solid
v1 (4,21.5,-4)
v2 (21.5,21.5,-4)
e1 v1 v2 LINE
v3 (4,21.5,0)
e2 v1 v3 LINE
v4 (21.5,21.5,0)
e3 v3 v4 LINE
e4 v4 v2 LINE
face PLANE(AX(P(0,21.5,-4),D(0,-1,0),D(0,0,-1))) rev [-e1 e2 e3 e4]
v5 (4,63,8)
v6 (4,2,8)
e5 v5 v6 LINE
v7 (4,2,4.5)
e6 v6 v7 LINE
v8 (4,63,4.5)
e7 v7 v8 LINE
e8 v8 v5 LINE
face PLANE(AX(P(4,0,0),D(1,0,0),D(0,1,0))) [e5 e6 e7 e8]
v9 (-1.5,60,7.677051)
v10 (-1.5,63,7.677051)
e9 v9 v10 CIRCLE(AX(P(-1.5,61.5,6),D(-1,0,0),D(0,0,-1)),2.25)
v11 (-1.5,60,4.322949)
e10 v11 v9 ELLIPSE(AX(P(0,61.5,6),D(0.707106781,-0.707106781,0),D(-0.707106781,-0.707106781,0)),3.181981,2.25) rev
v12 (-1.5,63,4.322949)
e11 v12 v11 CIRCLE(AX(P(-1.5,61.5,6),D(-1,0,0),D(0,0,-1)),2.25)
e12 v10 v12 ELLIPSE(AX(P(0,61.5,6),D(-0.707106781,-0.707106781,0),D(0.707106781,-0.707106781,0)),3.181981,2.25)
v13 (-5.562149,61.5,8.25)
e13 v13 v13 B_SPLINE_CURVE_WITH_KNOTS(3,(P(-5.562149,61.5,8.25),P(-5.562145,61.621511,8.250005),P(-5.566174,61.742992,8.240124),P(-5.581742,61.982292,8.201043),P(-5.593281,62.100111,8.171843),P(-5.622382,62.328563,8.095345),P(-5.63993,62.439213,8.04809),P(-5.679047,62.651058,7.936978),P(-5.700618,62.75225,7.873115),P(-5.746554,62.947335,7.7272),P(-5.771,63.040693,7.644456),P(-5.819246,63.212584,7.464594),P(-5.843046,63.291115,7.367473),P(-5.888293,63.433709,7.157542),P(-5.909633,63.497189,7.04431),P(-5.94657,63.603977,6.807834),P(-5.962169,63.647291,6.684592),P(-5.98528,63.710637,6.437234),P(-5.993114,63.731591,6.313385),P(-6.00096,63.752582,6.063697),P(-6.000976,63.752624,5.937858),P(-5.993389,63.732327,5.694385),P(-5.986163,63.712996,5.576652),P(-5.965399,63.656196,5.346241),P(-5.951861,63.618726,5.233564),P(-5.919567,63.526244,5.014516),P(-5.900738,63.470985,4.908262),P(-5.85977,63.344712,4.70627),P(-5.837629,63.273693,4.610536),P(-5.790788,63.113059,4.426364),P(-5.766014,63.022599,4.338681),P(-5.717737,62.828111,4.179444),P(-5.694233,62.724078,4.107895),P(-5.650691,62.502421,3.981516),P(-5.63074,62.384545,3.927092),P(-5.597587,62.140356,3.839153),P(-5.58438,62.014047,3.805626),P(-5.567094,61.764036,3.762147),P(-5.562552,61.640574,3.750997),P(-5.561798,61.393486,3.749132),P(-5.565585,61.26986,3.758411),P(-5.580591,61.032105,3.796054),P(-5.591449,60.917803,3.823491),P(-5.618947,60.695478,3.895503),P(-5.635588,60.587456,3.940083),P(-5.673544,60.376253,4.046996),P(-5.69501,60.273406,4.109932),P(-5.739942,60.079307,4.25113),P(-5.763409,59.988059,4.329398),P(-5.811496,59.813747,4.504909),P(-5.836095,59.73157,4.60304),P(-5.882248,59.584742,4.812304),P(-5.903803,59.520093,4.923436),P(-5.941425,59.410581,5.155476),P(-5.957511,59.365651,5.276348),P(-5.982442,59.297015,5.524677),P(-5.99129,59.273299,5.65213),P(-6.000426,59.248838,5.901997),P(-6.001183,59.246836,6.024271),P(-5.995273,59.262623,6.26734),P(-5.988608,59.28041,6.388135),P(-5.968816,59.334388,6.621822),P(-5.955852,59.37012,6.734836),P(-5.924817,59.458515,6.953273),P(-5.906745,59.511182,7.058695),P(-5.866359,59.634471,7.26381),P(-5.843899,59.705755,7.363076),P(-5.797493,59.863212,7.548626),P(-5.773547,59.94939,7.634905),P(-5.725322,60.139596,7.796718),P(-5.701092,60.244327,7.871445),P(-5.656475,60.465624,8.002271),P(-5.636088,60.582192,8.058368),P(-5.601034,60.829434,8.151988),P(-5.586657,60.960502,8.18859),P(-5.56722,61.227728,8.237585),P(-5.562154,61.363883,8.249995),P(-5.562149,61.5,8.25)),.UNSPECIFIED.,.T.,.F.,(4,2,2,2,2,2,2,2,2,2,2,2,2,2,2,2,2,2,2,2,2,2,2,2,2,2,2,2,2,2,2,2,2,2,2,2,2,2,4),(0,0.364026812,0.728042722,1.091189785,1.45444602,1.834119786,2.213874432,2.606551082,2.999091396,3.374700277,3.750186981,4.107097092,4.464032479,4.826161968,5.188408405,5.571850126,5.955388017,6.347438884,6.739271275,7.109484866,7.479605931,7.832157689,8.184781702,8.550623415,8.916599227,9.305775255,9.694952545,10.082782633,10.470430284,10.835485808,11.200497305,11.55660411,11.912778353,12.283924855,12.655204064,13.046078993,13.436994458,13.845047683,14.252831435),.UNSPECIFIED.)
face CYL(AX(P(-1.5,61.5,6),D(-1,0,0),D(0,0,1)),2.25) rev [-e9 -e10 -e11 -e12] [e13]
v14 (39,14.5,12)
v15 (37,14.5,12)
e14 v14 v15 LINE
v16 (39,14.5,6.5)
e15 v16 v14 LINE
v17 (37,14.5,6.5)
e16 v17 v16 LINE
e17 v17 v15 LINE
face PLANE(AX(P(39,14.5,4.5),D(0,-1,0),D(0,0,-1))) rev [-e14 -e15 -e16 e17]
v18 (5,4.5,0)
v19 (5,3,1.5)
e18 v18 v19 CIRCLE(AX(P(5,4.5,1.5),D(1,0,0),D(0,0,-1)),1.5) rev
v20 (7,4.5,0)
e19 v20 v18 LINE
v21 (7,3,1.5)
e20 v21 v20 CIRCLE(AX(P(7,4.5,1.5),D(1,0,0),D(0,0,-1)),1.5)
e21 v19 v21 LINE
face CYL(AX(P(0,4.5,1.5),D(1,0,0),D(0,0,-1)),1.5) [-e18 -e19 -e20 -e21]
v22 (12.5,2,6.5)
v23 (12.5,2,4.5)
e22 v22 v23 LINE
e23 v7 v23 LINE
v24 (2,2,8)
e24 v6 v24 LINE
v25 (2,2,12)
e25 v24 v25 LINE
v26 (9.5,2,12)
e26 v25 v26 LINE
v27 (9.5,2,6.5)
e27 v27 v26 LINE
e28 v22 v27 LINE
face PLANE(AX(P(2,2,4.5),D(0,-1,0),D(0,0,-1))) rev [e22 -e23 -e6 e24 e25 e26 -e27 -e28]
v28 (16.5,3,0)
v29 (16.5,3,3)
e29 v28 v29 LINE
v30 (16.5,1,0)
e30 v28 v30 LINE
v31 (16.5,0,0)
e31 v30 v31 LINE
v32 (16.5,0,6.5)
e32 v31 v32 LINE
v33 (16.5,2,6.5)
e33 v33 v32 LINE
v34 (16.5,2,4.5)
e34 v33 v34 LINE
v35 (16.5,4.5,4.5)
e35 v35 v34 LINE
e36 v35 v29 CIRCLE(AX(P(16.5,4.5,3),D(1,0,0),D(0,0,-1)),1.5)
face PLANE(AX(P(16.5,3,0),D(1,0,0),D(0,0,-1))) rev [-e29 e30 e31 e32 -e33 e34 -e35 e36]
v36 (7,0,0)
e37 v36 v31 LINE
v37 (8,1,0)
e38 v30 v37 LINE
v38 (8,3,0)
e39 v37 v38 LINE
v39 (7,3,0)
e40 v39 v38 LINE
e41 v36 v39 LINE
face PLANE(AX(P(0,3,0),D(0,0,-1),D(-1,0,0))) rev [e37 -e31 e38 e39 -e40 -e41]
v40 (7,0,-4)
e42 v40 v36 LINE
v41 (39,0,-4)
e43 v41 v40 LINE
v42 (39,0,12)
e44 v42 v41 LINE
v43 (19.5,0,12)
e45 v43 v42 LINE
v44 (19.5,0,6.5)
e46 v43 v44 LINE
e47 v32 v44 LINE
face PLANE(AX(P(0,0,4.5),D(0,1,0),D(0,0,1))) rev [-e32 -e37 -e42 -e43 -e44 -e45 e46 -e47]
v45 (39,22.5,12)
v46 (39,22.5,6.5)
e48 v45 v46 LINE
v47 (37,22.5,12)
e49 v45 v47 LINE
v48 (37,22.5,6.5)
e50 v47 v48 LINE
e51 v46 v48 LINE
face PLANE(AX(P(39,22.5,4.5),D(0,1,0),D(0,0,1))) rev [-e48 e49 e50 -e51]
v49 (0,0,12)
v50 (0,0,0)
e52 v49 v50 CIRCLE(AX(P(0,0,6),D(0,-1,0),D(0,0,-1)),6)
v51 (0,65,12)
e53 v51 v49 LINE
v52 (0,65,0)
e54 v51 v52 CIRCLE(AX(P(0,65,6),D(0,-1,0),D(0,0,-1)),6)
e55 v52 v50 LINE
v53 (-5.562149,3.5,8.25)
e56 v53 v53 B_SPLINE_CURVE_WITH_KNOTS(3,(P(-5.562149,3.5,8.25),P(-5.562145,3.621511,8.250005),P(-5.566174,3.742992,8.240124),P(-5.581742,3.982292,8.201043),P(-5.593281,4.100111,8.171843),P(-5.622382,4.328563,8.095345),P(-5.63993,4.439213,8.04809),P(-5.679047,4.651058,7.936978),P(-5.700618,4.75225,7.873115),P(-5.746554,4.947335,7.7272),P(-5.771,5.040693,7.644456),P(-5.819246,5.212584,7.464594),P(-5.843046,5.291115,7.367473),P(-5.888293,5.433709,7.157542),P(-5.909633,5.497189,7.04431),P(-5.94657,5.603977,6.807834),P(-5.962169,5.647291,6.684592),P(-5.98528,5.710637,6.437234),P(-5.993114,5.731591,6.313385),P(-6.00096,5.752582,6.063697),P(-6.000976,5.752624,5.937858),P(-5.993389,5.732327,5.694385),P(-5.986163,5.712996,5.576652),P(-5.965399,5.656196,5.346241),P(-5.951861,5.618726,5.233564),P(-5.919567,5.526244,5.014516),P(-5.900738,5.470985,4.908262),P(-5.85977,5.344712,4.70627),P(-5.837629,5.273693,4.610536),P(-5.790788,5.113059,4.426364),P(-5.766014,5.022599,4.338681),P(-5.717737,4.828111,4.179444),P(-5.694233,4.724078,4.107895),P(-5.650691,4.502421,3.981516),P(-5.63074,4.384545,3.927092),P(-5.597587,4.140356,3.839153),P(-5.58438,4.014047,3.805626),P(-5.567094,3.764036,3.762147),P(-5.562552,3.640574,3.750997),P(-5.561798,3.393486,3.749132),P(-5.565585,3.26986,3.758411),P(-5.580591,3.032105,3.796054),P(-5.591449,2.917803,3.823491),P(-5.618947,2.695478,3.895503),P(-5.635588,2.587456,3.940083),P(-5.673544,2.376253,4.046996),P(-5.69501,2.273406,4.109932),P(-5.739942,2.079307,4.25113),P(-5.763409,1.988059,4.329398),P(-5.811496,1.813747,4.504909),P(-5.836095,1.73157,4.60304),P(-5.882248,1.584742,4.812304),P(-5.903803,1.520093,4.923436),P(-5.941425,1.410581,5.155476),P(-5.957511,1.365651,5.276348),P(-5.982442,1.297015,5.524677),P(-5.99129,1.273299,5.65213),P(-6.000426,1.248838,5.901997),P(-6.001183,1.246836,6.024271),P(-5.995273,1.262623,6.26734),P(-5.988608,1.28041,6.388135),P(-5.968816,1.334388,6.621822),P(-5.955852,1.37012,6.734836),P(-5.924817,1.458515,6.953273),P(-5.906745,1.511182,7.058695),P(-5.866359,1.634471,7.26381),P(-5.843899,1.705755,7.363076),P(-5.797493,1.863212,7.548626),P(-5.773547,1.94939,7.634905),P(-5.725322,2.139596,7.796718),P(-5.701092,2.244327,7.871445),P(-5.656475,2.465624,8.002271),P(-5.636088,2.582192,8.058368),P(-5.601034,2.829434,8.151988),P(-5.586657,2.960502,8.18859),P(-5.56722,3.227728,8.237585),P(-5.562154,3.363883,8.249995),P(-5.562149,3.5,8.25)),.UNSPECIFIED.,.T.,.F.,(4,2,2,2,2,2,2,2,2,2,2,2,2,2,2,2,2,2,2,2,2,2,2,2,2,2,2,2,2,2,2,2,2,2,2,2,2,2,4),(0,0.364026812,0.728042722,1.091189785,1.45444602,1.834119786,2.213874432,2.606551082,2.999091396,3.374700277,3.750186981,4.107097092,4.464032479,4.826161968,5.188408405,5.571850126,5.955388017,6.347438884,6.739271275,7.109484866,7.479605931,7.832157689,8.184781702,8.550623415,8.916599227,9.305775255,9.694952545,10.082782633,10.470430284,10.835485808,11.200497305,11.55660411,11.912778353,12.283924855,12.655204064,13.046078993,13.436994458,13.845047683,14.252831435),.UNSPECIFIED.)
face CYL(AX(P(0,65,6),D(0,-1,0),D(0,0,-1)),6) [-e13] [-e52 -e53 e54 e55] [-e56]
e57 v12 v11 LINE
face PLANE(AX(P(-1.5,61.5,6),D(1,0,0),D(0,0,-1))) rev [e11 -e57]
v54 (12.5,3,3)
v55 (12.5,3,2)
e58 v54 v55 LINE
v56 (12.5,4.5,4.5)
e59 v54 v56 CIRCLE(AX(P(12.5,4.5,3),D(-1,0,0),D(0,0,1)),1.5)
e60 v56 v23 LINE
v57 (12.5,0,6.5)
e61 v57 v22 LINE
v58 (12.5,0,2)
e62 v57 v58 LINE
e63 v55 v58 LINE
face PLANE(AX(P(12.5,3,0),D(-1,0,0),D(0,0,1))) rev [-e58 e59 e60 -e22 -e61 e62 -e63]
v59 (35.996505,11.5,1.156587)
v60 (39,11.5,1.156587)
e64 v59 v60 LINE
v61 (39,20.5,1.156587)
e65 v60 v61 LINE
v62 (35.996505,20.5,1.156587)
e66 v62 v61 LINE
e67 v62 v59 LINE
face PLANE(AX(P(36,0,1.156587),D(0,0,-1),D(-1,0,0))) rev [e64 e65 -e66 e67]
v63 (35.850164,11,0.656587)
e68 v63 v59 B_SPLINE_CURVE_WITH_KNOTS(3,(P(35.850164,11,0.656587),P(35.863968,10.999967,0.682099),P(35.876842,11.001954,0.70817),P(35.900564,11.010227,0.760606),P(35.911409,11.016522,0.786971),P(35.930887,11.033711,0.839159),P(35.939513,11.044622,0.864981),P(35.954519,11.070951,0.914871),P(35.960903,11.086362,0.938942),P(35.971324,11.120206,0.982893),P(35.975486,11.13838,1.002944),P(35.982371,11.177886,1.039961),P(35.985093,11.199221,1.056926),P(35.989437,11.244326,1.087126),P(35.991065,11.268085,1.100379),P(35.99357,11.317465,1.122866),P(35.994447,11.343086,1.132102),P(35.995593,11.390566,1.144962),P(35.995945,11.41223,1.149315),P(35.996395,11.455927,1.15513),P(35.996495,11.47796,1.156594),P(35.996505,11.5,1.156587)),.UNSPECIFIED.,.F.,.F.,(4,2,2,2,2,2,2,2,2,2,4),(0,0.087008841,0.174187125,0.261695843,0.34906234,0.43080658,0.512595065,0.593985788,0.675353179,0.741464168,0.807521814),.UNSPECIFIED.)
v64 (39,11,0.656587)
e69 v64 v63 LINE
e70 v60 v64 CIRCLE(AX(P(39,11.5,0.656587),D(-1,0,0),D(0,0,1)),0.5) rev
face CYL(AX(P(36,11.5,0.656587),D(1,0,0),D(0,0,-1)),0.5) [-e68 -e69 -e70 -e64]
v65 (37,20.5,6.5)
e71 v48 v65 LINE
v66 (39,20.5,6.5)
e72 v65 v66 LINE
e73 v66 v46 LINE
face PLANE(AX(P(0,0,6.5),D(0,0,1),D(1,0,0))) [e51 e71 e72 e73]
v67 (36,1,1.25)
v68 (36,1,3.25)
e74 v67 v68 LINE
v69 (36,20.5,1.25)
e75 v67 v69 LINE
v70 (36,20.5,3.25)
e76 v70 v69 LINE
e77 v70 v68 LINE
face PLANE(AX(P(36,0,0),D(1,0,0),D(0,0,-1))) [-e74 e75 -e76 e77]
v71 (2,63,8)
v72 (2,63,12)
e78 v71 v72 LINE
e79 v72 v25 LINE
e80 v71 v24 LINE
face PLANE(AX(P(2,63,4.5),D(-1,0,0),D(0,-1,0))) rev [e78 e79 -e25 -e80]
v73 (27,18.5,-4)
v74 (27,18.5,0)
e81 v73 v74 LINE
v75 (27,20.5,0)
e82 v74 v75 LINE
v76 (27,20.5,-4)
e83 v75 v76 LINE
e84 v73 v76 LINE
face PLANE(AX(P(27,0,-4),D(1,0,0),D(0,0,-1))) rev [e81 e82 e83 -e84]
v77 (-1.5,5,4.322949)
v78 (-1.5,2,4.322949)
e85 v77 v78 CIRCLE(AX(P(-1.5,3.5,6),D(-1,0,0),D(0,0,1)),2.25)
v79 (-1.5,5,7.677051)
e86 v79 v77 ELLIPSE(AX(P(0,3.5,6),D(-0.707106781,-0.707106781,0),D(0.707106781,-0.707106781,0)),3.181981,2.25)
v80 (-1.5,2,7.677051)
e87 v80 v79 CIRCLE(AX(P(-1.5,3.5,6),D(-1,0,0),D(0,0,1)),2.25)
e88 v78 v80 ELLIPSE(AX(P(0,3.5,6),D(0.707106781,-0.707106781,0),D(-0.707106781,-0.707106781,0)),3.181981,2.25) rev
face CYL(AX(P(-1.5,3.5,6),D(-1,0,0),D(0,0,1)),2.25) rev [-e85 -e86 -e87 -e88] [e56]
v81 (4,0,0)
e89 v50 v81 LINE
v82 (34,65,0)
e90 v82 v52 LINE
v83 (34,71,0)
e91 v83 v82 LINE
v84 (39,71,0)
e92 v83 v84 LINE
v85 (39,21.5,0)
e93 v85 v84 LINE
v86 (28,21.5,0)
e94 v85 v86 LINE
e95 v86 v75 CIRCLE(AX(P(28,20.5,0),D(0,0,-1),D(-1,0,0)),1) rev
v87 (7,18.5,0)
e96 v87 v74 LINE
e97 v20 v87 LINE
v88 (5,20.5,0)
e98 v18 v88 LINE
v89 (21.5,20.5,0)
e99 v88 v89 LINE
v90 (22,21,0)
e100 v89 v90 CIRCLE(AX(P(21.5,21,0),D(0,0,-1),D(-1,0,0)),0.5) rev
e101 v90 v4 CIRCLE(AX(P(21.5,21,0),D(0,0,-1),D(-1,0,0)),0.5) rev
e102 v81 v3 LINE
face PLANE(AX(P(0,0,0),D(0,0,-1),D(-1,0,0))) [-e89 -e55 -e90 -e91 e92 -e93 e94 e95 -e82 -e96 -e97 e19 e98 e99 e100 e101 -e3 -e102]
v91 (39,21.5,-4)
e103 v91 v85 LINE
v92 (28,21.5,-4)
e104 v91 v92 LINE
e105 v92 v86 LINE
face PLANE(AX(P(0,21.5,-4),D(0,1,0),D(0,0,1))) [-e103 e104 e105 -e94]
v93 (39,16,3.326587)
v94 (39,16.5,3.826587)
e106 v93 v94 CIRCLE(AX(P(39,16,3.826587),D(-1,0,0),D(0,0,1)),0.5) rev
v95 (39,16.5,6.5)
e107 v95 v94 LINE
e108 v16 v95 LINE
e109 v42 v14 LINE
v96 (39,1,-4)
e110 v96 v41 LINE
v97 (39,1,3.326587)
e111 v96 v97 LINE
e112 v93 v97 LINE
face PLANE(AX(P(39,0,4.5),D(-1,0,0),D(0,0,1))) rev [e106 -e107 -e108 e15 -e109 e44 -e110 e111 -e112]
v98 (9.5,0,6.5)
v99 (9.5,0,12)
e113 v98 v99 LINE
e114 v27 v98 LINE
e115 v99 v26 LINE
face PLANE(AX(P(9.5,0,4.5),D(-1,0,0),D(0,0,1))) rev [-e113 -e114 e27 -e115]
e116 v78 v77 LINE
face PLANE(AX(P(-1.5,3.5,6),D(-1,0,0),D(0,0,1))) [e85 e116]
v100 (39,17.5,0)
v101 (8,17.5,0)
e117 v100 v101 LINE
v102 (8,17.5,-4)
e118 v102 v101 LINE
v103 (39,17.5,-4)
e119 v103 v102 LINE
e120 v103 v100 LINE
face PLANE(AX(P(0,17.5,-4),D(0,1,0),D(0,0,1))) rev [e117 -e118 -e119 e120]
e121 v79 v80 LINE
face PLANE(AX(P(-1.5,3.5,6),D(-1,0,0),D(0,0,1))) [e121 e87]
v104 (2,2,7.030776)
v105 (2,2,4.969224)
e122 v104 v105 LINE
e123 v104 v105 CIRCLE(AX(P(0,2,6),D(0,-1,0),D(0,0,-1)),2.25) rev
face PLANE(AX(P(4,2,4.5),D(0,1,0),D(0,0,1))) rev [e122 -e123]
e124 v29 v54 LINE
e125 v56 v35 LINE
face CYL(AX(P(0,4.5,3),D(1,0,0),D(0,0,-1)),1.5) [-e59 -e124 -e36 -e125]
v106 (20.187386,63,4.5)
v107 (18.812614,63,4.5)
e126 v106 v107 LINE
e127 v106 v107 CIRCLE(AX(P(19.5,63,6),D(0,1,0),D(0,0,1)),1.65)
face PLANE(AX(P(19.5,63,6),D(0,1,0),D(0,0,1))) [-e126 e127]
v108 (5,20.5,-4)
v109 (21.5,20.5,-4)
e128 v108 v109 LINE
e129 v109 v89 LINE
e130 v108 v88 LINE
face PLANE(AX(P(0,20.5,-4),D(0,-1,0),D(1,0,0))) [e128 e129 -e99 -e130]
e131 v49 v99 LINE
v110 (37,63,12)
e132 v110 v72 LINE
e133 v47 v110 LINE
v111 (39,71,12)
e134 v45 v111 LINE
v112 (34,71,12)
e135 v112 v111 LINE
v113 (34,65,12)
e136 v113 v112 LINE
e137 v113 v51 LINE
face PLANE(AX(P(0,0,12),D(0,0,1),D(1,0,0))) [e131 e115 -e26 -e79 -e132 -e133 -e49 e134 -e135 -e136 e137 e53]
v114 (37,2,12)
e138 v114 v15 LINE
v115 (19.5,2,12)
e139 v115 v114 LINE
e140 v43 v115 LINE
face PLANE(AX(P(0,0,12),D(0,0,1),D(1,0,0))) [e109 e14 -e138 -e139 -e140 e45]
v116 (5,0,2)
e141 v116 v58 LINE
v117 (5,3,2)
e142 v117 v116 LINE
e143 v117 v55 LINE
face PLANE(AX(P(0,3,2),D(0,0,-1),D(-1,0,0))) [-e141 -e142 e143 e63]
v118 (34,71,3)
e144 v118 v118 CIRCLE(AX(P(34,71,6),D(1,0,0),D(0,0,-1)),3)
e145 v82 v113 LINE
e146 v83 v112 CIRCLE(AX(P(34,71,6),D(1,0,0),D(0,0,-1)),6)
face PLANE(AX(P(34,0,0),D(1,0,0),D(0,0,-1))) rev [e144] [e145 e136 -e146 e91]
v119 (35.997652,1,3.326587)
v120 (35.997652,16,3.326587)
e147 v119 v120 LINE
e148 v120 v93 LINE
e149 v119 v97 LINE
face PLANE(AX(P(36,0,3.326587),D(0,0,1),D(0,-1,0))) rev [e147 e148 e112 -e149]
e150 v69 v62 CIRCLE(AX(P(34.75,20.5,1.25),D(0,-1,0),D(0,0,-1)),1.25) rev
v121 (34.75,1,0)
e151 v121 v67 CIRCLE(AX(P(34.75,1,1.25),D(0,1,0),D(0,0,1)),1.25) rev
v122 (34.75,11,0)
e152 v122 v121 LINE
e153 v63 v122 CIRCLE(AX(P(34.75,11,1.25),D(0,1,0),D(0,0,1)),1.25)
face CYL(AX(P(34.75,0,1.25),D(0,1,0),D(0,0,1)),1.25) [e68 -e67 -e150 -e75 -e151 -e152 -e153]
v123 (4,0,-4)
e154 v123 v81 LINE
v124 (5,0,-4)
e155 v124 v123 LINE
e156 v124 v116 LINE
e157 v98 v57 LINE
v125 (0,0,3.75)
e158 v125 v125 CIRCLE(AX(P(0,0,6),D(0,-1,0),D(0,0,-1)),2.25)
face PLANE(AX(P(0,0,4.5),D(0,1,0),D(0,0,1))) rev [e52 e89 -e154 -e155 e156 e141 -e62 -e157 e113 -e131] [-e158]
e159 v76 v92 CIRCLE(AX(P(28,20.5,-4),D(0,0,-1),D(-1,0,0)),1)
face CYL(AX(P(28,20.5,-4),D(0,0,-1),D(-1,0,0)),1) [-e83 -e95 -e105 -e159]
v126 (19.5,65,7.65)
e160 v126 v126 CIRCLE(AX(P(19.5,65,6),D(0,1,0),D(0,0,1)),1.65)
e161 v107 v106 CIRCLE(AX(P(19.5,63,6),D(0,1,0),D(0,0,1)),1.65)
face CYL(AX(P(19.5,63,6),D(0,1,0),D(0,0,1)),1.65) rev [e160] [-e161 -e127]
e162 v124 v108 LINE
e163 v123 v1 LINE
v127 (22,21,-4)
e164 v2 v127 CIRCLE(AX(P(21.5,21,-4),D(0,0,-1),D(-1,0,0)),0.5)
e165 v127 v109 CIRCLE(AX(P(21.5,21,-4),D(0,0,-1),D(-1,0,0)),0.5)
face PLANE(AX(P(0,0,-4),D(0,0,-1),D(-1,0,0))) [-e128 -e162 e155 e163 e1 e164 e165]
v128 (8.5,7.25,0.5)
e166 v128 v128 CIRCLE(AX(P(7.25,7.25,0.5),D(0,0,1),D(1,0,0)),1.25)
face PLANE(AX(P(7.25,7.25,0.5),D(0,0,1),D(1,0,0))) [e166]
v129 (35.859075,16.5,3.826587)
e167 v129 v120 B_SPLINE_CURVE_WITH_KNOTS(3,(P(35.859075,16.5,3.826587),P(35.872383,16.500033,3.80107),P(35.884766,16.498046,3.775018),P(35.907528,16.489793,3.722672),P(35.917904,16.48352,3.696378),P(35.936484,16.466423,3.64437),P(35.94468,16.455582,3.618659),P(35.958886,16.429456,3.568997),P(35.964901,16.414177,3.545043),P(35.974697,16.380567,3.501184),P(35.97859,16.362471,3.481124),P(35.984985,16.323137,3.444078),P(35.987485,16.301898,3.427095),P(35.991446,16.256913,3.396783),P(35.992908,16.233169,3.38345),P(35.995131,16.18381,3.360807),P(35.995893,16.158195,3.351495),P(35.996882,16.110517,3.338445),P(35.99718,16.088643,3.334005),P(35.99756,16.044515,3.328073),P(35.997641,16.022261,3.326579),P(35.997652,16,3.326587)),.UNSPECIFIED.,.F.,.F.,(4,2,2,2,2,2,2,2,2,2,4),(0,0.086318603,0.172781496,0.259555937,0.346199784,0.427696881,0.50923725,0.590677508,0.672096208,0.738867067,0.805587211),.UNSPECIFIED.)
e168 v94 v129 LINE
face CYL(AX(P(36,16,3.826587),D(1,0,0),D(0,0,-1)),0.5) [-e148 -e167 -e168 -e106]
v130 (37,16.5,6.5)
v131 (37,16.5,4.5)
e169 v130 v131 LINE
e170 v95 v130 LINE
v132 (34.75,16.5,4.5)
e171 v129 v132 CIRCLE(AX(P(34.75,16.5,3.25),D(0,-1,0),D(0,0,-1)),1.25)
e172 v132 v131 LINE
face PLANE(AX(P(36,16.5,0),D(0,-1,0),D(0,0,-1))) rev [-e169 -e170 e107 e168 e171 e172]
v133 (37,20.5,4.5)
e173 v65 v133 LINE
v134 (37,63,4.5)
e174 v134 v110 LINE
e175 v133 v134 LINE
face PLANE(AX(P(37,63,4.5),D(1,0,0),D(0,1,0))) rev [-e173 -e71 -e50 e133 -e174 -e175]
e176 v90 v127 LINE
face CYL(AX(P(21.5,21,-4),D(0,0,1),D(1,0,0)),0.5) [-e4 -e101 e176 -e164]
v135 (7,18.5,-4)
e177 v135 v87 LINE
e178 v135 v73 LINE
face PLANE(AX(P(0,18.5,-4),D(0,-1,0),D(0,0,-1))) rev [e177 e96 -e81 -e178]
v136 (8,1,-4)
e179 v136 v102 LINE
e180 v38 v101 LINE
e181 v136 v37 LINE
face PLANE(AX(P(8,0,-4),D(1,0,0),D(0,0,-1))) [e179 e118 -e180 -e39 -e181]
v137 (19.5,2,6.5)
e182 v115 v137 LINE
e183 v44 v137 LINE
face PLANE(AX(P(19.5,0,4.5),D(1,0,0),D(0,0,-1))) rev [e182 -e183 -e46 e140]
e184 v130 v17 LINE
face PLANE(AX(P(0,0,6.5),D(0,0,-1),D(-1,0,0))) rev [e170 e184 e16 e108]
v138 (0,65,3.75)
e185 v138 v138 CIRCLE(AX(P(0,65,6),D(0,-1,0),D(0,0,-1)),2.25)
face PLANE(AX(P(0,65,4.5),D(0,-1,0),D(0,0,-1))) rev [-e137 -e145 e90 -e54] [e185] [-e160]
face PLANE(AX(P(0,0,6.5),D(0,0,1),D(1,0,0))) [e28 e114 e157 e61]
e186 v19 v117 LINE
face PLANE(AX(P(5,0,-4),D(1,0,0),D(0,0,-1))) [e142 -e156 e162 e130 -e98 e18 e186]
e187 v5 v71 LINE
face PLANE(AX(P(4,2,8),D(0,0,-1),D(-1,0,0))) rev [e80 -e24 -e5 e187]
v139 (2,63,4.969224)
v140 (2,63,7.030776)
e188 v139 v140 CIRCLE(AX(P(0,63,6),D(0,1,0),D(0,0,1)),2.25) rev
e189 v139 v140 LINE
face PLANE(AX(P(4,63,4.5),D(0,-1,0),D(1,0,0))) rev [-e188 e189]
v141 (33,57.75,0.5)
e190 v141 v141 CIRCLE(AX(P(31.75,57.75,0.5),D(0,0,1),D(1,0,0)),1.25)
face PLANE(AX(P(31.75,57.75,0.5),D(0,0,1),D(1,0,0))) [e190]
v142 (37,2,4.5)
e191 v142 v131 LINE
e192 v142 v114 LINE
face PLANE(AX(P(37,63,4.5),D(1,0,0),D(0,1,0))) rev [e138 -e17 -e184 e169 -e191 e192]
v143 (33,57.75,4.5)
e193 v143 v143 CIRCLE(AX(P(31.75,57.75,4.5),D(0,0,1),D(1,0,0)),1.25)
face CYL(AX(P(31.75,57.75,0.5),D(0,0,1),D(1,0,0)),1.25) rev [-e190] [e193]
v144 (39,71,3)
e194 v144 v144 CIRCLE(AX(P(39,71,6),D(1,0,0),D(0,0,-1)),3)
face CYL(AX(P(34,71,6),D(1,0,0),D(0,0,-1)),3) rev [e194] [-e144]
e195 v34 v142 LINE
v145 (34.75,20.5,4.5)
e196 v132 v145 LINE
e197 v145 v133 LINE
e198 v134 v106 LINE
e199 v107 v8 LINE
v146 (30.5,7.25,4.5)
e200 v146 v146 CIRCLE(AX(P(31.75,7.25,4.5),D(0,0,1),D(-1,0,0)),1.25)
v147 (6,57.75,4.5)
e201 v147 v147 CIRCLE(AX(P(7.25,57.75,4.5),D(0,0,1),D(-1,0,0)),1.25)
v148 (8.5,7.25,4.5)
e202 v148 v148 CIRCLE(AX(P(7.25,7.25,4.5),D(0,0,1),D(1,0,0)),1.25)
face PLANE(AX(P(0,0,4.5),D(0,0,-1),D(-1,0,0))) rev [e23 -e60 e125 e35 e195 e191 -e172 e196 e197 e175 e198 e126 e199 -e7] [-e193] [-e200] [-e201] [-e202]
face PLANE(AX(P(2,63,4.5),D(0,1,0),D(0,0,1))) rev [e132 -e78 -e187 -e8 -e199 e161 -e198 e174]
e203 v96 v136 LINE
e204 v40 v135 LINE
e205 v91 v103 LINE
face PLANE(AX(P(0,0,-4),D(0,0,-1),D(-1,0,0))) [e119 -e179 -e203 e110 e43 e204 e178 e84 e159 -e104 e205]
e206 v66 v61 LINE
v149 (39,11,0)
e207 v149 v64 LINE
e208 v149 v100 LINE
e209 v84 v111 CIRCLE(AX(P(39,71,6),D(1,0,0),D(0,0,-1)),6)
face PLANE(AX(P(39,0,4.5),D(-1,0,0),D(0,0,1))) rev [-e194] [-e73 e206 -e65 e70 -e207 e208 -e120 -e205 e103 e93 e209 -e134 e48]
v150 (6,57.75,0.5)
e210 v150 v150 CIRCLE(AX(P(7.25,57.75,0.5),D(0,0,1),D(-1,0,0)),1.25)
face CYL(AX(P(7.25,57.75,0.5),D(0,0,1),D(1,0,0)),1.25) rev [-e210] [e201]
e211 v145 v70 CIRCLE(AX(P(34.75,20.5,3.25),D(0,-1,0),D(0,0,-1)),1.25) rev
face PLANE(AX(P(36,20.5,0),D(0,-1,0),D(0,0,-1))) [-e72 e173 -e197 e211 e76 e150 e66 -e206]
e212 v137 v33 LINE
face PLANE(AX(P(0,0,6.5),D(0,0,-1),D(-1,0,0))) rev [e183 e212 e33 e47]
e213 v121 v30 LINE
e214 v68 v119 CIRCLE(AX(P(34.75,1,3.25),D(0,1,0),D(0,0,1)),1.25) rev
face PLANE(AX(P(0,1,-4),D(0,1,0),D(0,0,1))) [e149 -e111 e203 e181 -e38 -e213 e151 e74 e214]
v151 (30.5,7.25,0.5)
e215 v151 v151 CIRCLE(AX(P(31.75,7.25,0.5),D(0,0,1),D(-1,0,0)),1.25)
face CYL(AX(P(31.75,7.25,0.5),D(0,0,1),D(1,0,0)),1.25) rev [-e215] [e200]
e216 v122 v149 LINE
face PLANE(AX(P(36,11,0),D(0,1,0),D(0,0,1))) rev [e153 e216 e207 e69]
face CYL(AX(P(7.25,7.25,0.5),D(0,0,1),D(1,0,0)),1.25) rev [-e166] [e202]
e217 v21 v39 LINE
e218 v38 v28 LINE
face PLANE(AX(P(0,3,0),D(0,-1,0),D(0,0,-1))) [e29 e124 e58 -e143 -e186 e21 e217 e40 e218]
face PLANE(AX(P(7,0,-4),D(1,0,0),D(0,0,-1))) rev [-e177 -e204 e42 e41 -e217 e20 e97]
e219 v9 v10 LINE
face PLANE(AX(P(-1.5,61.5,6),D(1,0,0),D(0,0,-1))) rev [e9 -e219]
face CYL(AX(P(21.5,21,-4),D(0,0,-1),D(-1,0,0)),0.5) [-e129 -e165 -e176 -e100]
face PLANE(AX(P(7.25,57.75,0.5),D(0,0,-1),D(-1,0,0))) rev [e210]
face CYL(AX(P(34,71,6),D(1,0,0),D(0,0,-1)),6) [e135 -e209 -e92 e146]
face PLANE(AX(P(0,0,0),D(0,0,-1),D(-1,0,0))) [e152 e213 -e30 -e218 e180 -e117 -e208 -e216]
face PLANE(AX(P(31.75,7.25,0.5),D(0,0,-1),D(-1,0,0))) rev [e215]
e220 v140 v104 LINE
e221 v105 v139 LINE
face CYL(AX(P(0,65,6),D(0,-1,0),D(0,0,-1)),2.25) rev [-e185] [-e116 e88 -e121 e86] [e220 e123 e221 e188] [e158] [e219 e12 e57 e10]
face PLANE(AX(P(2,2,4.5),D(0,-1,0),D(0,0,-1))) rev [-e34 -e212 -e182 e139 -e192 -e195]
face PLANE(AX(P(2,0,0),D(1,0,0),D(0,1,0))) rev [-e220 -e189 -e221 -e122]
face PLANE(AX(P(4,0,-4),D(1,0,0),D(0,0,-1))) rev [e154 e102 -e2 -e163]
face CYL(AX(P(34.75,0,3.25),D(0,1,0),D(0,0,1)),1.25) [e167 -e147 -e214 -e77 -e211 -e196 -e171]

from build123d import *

# Parameters (mm, degrees)
SKETCH1_W                = 39
SKETCH1_H                = 65
BASE_DEPTH               = 4.5
SKETCH2_W                = 4
SKETCH2_H                = 57
WALLS_DEPTH              = 7.5
SKETCH3_W                = 10
SKETCH3_H                = 7.5
PWR_CONNECTOR_HOLE_DEPTH = 4
SKETCH4_W                = 7.5
SKETCH4_H                = 8
GPS_CONNECTOR_HOLE_DEPTH = 4
SKETCH5_R                = 1.25
MOUNTING_HOLES_DEPTH     = 4
GPS_MOUNT_DEPTH          = 4
SKETCH11_W               = 17
SKETCH11_H               = 1
SKETCH11_W_2             = 12
SKETCH11_H_2             = 3
PWR_CABLE_HOLDER1_DEPTH  = 4
SKETCH12_W               = 4
SKETCH12_H               = 2.5
PWR_CABLE_HOLDER2_DEPTH  = 3
PWR_FILLET_R             = 1.5
PWR_FILLET2_R            = 1
PWR_FILLET3_R            = 0.5
GPS_CABLE_HOLDER_DEPTH   = 3
GPS_START                = 1
GPS_FILLET_DEPTH         = 10
GPS_START_2              = 16.5
GPS_FILLET_2_DEPTH       = 4
GPS_START_3              = 9.15727
GPS_FILLET_3_DEPTH       = 8.34273
GPS_FILLET2_R            = 0.5
SKETCH15_R               = 6
BALLON_MOUNT_DEPTH       = 65
SKETCH16_R               = 2.25
BALLOON_MOUNT_HOLE_DEPTH = 65
SKETCH21_R               = 2.25
SAFETY_MOUNT_DEPTH       = 4.5
SKETCH22_W               = 35
SKETCH22_H               = 61
LID_HOLE_DEPTH           = 7.5
SKETCH25_W               = 3.5
SKETCH25_H               = 61
CORRECTION_DEPTH         = 2
SKETCH28_W               = 2
SKETCH28_H               = 2
SKETCH28_W_2             = 3
SMALL_WALLS_DEPTH        = 2
ANTENNA_MOUNTING_DEPTH   = 5
SKETCH30_R               = 3
ANTENNA_HOLE_DEPTH       = 5
SKETCH31_R               = 1.65
CABLE_HOLE_DEPTH         = 2


with BuildPart() as part:
    # Sketch1 → Base (new body)
    with BuildSketch(Plane.XY):
        with Locations((19.5, 32.5)):
            Rectangle(SKETCH1_W, SKETCH1_H)
    extrude(amount=BASE_DEPTH)

    # Sketch2 → Walls (add)
    with BuildSketch(Plane.XY.offset(4.5)):
        Polygon((39, 61), (39, 65), (0, 65), (0, 61), (4, 61), (35, 61), align=None)
        with Locations((37, 32.5)):
            Rectangle(SKETCH2_W, SKETCH2_H)
        Polygon((4, 61), (0, 61), (0, 0), (4, 0), (4, 4), align=None)
        Polygon((39, 0), (39, 4), (35, 4), (4, 4), (4, 0), align=None)
    extrude(amount=WALLS_DEPTH)

    # Sketch3 → PWR connector hole (cut)
    with BuildSketch(Plane(origin=(0, 4, 0), x_dir=(1, 0, 0), z_dir=(0, 1, 0))):
        with Locations((14.5, -8.25)):
            Rectangle(SKETCH3_W, SKETCH3_H)
    extrude(amount=-PWR_CONNECTOR_HOLE_DEPTH, mode=Mode.SUBTRACT)

    # Sketch4 → GPS connector hole (cut)
    with BuildSketch(Plane.ZY.offset(-35)):
        with Locations((8.25, 18.5)):
            Rectangle(SKETCH4_W, SKETCH4_H)
    extrude(amount=-GPS_CONNECTOR_HOLE_DEPTH, mode=Mode.SUBTRACT)

    # Sketch5 → Mounting holes (cut)
    with BuildSketch(Plane.XY.offset(4.5)):
        with Locations((7.25, 7.25)):
            Circle(SKETCH5_R)
        with Locations(Location((31.75, 7.25, 0), (0, 0, 180))):
            Circle(SKETCH5_R)
        with Locations(Location((7.25, 57.75, 0), (0, 0, 180))):
            Circle(SKETCH5_R)
        with Locations((31.75, 57.75)):
            Circle(SKETCH5_R)
    extrude(amount=-MOUNTING_HOLES_DEPTH, mode=Mode.SUBTRACT)

    # Sketch7 → GPS mount (add)
    with BuildSketch(Plane(origin=(0, 0, 0), x_dir=(-1, 0, 0), z_dir=(0, 0, -1))):
        Polygon((-39, 1), (-39, 0), (-7, 0), (-7, 18.5), (-39, 18.5), (-39, 17.5), (-8, 17.5), (-8, 1), align=None)
    extrude(amount=GPS_MOUNT_DEPTH)

    # Sketch11 → PWR cable holder1 (add)
    with BuildSketch(Plane(origin=(0, 0, 0), x_dir=(-1, 0, 0), z_dir=(0, 0, -1))):
        Polygon((-5, 0), (-4, 0), (-4, 21.5), (-5, 21.5), (-5, 20.5), align=None)
        with Locations((-13.5, 21)):
            Rectangle(SKETCH11_W, SKETCH11_H)
        with Locations((-33, 20)):
            Rectangle(SKETCH11_W_2, SKETCH11_H_2)
    extrude(amount=PWR_CABLE_HOLDER1_DEPTH)

    # Sketch12 → PWR cable holder2 (cut)
    with BuildSketch(Plane.XZ):
        Polygon((5, 2), (5, 0), (7, 0), (16.5, 0), (16.5, 2), (12.5, 2), align=None)
        with Locations((14.5, 3.25)):
            Rectangle(SKETCH12_W, SKETCH12_H)
    extrude(amount=-PWR_CABLE_HOLDER2_DEPTH, mode=Mode.SUBTRACT)

    # PWR fillet
    pwr_fillet_edges = [part.edges().sort_by_distance(p)[0] for p in [
        (6, 3, 0),
        (14.5, 3, 4.5),
    ]]
    fillet(pwr_fillet_edges, radius=PWR_FILLET_R)

    # PWR fillet2
    pwr_fillet2_edges = [part.edges().sort_by_distance(p)[0] for p in [
        (27, 21.5, -2),
    ]]
    fillet(pwr_fillet2_edges, radius=PWR_FILLET2_R)

    # PWR fillet3
    pwr_fillet3_edges = [part.edges().sort_by_distance(p)[0] for p in [
        (22, 21.5, -2),
        (22, 20.5, -2),
    ]]
    fillet(pwr_fillet3_edges, radius=PWR_FILLET3_R - 0.0001)  # a hair under: the kernel refuses the full size

    # Sketch13 → GPS cable holder (cut)
    with BuildSketch(Plane(origin=(39, 0, 0), x_dir=(0, 0, -1), z_dir=(1, 0, 0))):
        Polygon((-1.156586719, 11), (-2.326586719, 11), (-2.326586719, 1), (0, 1), (0, 11), align=None)
        Polygon((-2.326586719, 11), (-2.326586719, 16.5), (-3.326586719, 16.5), (-3.326586719, 1), (-2.326586719, 1), align=None)
        Polygon((-1.156586719, 20.5), (-2.326586719, 20.5), (-2.326586719, 16.5), (-2.326586719, 11), (-1.156586719, 11), align=None)
        Polygon((-2.326586719, 20.5), (-4.5, 20.5), (-4.5, 16.5), (-3.326586719, 16.5), (-2.326586719, 16.5), align=None)
    extrude(amount=-GPS_CABLE_HOLDER_DEPTH, mode=Mode.SUBTRACT)

    # GPS fillet: read off the stored shape, not the designer's step
    # GPS fillet outline → GPS fillet (cut)
    with BuildSketch(Plane(origin=(0, 0, 0), x_dir=(1, 0, 0), z_dir=(0, 1, 0)).offset(GPS_START)):
        with BuildLine():
            Line((36, -3.326586719), (36, -3.25))
            ThreePointArc((36, -3.25), (35.999412758, -3.288311358), (35.997651584, -3.326586719))
            Line((35.997651584, -3.326586719), (36, -3.326586719))
        make_face()
        with BuildLine():
            Line((36, -1.25), (36, 0))
            Line((36, 0), (34.75, 0))
            ThreePointArc((34.75, 0), (35.633883476, -0.366116524), (36, -1.25))
        make_face()
    extrude(amount=GPS_FILLET_DEPTH, mode=Mode.SUBTRACT)

    # GPS fillet 2 outline → GPS fillet 2 (cut)
    with BuildSketch(Plane(origin=(0, 0, 0), x_dir=(1, 0, 0), z_dir=(0, 1, 0)).offset(GPS_START_2)):
        with BuildLine():
            ThreePointArc((36, -3.25), (35.633883476, -4.133883476), (34.75, -4.5))
            Line((34.75, -4.5), (36, -4.5))
            Line((36, -4.5), (36, -3.25))
        make_face()
        with BuildLine():
            ThreePointArc((35.996504697, -1.156586719), (35.999125868, -1.203260674), (36, -1.25))
            Line((36, -1.25), (36, -1.156586719))
            Line((36, -1.156586719), (35.996504697, -1.156586719))
        make_face()
    extrude(amount=GPS_FILLET_2_DEPTH, mode=Mode.SUBTRACT)

    # GPS fillet 3 outline → GPS fillet 3 (cut)
    with BuildSketch(Plane(origin=(0, 0, 0), x_dir=(1, 0, 0), z_dir=(0, 1, 0)).offset(GPS_START_3)):
        with BuildLine():
            Line((36, -3.326586719), (36, -3.25))
            ThreePointArc((36, -3.25), (35.999412758, -3.288311358), (35.997651584, -3.326586719))
            Line((35.997651584, -3.326586719), (36, -3.326586719))
        make_face()
        with BuildLine():
            ThreePointArc((35.996504697, -1.156586719), (35.999125868, -1.203260674), (36, -1.25))
            Line((36, -1.25), (36, -1.156586719))
            Line((36, -1.156586719), (35.996504697, -1.156586719))
        make_face()
    extrude(amount=GPS_FILLET_3_DEPTH, mode=Mode.SUBTRACT)

    # GPS fillet2
    # the kernel refuses this fillet: 0.5 mm, written as the material it takes off along each edge
    with BuildSketch(Plane(origin=(40.25, 11, 1.156586719), x_dir=(0, 0, -1), z_dir=(-1, 0, 0))) as gps_fillet2_piece_1:
        with BuildLine():
            CenterArc((GPS_FILLET2_R, -GPS_FILLET2_R), GPS_FILLET2_R, 90, 90)
            Line((0, -GPS_FILLET2_R), (0, 0))
            Line((0, 0), (GPS_FILLET2_R, 0))
        make_face()
    extrude(amount=4.25, mode=Mode.SUBTRACT)
    with BuildSketch(Plane(origin=(40.25, 16.5, 3.326586719), x_dir=(0, -1, 0), z_dir=(-1, 0, 0))) as gps_fillet2_piece_2:
        with BuildLine():
            CenterArc((GPS_FILLET2_R, GPS_FILLET2_R), GPS_FILLET2_R, 180, 90)
            Line((0, GPS_FILLET2_R), (0, 0))
            Line((0, 0), (GPS_FILLET2_R, 0))
        make_face()
    extrude(amount=4.25, mode=Mode.SUBTRACT)
    with BuildSketch(Plane(origin=(36, 16.5, 3.326586719), x_dir=(0, -1.0, 5.126796764898245e-10), z_dir=(-1, 0, 0))) as gps_fillet2_piece_3_section:
        with BuildLine():
            CenterArc((GPS_FILLET2_R, GPS_FILLET2_R), GPS_FILLET2_R, 179.999999971, 90)
            Line((GPS_FILLET2_R * 5.12679676753e-10, GPS_FILLET2_R), (0, 0))
            Line((0, 0), (GPS_FILLET2_R, 0))
        make_face()
    gps_fillet2_piece_3 = extrude(amount=1.252348417, mode=Mode.PRIVATE)
    gps_fillet2_piece_3 = gps_fillet2_piece_3 - Plane(origin=(34.749999755, 16.5, 3.249999996), x_dir=(1.0, 0, 2.949740140725451e-09), z_dir=(0, -1, 0)) * Cylinder(1.250000245, 5, mode=Mode.PRIVATE)
    add(gps_fillet2_piece_3, mode=Mode.SUBTRACT)
    with BuildSketch(Plane(origin=(34.746504697, 11, 1.156586719), x_dir=(0, 0, -1), z_dir=(1, 0, 0))) as gps_fillet2_piece_4_section:
        with BuildLine():
            CenterArc((GPS_FILLET2_R, GPS_FILLET2_R), GPS_FILLET2_R, 180, 90)
            Line((-GPS_FILLET2_R * 5.12674791509e-10, GPS_FILLET2_R), (0, 0))
            Line((0, 0), (GPS_FILLET2_R, 0))
        make_face()
    gps_fillet2_piece_4 = extrude(amount=1.253495303, mode=Mode.PRIVATE)
    gps_fillet2_piece_4 = gps_fillet2_piece_4 - Plane(origin=(34.749999998, 11, 1.250000002), x_dir=(1.3197563913171698e-09, 0, -1.0), z_dir=(0, -1, 0)) * Cylinder(1.250000002, 5, mode=Mode.PRIVATE)
    add(gps_fillet2_piece_4, mode=Mode.SUBTRACT)

    # Sketch15 → Ballon mount (add)
    with BuildSketch(Plane.XZ):
        with Locations((0, 6)):
            Circle(SKETCH15_R)
    extrude(amount=-BALLON_MOUNT_DEPTH)

    # Sketch16 → Balloon mount hole (cut)
    with BuildSketch(Plane.XZ):
        with Locations(Location((0, 6, 0), (0, 0, 270))):
            Circle(SKETCH16_R)
    extrude(amount=-BALLOON_MOUNT_HOLE_DEPTH, mode=Mode.SUBTRACT)

    # Sketch21 → Safety mount (cut)
    with BuildSketch(Plane.ZY.offset(6)):
        with Locations((6, 3.5)):
            Circle(SKETCH21_R)
        with Locations((6, 61.5)):
            Circle(SKETCH21_R)
    extrude(amount=-SAFETY_MOUNT_DEPTH, mode=Mode.SUBTRACT)

    # Sketch22 → Lid hole (cut)
    with BuildSketch(Plane.XY.offset(12)):
        with Locations((19.5, 32.5)):
            Rectangle(SKETCH22_W, SKETCH22_H)
    extrude(amount=-LID_HOLE_DEPTH, mode=Mode.SUBTRACT)

    # Sketch25 → Correction (add)
    with BuildSketch(Plane(origin=(2, 0, 0), x_dir=(0, 0, -1), z_dir=(1, 0, 0))):
        with Locations((-6.25, 32.5)):
            Rectangle(SKETCH25_W, SKETCH25_H)
    extrude(amount=CORRECTION_DEPTH)

    # Sketch28 → Small walls (add)
    with BuildSketch(Plane.XY.offset(4.5)):
        with Locations((38, 21.5)):
            Rectangle(SKETCH28_W, SKETCH28_H)
        with Locations((38, 15.5)):
            Rectangle(SKETCH28_W, SKETCH28_H)
        with Locations((18, 1)):
            Rectangle(SKETCH28_W_2, SKETCH28_H)
        with Locations((11, 1)):
            Rectangle(SKETCH28_W_2, SKETCH28_H)
    extrude(amount=SMALL_WALLS_DEPTH)

    # Sketch29 → Antenna mounting (add)
    with BuildSketch(Plane(origin=(39, 0, 0), x_dir=(0, 0, -1), z_dir=(1, 0, 0))):
        with BuildLine():
            Line((0, 65), (0, 71))
            ThreePointArc((0, 71), (-6, 77), (-12, 71))
            Line((-12, 71), (-12, 65))
            Line((-12, 65), (0, 65))
        make_face()
    extrude(amount=-ANTENNA_MOUNTING_DEPTH)

    # Sketch30 → Antenna hole (cut)
    with BuildSketch(Plane(origin=(39, 0, 0), x_dir=(0, 0, -1), z_dir=(1, 0, 0))):
        with Locations((-6, 71)):
            Circle(SKETCH30_R)
    extrude(amount=-ANTENNA_HOLE_DEPTH, mode=Mode.SUBTRACT)

    # Sketch31 → Cable hole (cut)
    with BuildSketch(Plane(origin=(0, 65, 0), x_dir=(1, 0, 0), z_dir=(0, 1, 0))):
        with Locations(Location((19.5, -6, 0), (0, 0, 270))):
            Circle(SKETCH31_R)
    extrude(amount=-CABLE_HOLE_DEPTH, mode=Mode.SUBTRACT)


solid = part.part
